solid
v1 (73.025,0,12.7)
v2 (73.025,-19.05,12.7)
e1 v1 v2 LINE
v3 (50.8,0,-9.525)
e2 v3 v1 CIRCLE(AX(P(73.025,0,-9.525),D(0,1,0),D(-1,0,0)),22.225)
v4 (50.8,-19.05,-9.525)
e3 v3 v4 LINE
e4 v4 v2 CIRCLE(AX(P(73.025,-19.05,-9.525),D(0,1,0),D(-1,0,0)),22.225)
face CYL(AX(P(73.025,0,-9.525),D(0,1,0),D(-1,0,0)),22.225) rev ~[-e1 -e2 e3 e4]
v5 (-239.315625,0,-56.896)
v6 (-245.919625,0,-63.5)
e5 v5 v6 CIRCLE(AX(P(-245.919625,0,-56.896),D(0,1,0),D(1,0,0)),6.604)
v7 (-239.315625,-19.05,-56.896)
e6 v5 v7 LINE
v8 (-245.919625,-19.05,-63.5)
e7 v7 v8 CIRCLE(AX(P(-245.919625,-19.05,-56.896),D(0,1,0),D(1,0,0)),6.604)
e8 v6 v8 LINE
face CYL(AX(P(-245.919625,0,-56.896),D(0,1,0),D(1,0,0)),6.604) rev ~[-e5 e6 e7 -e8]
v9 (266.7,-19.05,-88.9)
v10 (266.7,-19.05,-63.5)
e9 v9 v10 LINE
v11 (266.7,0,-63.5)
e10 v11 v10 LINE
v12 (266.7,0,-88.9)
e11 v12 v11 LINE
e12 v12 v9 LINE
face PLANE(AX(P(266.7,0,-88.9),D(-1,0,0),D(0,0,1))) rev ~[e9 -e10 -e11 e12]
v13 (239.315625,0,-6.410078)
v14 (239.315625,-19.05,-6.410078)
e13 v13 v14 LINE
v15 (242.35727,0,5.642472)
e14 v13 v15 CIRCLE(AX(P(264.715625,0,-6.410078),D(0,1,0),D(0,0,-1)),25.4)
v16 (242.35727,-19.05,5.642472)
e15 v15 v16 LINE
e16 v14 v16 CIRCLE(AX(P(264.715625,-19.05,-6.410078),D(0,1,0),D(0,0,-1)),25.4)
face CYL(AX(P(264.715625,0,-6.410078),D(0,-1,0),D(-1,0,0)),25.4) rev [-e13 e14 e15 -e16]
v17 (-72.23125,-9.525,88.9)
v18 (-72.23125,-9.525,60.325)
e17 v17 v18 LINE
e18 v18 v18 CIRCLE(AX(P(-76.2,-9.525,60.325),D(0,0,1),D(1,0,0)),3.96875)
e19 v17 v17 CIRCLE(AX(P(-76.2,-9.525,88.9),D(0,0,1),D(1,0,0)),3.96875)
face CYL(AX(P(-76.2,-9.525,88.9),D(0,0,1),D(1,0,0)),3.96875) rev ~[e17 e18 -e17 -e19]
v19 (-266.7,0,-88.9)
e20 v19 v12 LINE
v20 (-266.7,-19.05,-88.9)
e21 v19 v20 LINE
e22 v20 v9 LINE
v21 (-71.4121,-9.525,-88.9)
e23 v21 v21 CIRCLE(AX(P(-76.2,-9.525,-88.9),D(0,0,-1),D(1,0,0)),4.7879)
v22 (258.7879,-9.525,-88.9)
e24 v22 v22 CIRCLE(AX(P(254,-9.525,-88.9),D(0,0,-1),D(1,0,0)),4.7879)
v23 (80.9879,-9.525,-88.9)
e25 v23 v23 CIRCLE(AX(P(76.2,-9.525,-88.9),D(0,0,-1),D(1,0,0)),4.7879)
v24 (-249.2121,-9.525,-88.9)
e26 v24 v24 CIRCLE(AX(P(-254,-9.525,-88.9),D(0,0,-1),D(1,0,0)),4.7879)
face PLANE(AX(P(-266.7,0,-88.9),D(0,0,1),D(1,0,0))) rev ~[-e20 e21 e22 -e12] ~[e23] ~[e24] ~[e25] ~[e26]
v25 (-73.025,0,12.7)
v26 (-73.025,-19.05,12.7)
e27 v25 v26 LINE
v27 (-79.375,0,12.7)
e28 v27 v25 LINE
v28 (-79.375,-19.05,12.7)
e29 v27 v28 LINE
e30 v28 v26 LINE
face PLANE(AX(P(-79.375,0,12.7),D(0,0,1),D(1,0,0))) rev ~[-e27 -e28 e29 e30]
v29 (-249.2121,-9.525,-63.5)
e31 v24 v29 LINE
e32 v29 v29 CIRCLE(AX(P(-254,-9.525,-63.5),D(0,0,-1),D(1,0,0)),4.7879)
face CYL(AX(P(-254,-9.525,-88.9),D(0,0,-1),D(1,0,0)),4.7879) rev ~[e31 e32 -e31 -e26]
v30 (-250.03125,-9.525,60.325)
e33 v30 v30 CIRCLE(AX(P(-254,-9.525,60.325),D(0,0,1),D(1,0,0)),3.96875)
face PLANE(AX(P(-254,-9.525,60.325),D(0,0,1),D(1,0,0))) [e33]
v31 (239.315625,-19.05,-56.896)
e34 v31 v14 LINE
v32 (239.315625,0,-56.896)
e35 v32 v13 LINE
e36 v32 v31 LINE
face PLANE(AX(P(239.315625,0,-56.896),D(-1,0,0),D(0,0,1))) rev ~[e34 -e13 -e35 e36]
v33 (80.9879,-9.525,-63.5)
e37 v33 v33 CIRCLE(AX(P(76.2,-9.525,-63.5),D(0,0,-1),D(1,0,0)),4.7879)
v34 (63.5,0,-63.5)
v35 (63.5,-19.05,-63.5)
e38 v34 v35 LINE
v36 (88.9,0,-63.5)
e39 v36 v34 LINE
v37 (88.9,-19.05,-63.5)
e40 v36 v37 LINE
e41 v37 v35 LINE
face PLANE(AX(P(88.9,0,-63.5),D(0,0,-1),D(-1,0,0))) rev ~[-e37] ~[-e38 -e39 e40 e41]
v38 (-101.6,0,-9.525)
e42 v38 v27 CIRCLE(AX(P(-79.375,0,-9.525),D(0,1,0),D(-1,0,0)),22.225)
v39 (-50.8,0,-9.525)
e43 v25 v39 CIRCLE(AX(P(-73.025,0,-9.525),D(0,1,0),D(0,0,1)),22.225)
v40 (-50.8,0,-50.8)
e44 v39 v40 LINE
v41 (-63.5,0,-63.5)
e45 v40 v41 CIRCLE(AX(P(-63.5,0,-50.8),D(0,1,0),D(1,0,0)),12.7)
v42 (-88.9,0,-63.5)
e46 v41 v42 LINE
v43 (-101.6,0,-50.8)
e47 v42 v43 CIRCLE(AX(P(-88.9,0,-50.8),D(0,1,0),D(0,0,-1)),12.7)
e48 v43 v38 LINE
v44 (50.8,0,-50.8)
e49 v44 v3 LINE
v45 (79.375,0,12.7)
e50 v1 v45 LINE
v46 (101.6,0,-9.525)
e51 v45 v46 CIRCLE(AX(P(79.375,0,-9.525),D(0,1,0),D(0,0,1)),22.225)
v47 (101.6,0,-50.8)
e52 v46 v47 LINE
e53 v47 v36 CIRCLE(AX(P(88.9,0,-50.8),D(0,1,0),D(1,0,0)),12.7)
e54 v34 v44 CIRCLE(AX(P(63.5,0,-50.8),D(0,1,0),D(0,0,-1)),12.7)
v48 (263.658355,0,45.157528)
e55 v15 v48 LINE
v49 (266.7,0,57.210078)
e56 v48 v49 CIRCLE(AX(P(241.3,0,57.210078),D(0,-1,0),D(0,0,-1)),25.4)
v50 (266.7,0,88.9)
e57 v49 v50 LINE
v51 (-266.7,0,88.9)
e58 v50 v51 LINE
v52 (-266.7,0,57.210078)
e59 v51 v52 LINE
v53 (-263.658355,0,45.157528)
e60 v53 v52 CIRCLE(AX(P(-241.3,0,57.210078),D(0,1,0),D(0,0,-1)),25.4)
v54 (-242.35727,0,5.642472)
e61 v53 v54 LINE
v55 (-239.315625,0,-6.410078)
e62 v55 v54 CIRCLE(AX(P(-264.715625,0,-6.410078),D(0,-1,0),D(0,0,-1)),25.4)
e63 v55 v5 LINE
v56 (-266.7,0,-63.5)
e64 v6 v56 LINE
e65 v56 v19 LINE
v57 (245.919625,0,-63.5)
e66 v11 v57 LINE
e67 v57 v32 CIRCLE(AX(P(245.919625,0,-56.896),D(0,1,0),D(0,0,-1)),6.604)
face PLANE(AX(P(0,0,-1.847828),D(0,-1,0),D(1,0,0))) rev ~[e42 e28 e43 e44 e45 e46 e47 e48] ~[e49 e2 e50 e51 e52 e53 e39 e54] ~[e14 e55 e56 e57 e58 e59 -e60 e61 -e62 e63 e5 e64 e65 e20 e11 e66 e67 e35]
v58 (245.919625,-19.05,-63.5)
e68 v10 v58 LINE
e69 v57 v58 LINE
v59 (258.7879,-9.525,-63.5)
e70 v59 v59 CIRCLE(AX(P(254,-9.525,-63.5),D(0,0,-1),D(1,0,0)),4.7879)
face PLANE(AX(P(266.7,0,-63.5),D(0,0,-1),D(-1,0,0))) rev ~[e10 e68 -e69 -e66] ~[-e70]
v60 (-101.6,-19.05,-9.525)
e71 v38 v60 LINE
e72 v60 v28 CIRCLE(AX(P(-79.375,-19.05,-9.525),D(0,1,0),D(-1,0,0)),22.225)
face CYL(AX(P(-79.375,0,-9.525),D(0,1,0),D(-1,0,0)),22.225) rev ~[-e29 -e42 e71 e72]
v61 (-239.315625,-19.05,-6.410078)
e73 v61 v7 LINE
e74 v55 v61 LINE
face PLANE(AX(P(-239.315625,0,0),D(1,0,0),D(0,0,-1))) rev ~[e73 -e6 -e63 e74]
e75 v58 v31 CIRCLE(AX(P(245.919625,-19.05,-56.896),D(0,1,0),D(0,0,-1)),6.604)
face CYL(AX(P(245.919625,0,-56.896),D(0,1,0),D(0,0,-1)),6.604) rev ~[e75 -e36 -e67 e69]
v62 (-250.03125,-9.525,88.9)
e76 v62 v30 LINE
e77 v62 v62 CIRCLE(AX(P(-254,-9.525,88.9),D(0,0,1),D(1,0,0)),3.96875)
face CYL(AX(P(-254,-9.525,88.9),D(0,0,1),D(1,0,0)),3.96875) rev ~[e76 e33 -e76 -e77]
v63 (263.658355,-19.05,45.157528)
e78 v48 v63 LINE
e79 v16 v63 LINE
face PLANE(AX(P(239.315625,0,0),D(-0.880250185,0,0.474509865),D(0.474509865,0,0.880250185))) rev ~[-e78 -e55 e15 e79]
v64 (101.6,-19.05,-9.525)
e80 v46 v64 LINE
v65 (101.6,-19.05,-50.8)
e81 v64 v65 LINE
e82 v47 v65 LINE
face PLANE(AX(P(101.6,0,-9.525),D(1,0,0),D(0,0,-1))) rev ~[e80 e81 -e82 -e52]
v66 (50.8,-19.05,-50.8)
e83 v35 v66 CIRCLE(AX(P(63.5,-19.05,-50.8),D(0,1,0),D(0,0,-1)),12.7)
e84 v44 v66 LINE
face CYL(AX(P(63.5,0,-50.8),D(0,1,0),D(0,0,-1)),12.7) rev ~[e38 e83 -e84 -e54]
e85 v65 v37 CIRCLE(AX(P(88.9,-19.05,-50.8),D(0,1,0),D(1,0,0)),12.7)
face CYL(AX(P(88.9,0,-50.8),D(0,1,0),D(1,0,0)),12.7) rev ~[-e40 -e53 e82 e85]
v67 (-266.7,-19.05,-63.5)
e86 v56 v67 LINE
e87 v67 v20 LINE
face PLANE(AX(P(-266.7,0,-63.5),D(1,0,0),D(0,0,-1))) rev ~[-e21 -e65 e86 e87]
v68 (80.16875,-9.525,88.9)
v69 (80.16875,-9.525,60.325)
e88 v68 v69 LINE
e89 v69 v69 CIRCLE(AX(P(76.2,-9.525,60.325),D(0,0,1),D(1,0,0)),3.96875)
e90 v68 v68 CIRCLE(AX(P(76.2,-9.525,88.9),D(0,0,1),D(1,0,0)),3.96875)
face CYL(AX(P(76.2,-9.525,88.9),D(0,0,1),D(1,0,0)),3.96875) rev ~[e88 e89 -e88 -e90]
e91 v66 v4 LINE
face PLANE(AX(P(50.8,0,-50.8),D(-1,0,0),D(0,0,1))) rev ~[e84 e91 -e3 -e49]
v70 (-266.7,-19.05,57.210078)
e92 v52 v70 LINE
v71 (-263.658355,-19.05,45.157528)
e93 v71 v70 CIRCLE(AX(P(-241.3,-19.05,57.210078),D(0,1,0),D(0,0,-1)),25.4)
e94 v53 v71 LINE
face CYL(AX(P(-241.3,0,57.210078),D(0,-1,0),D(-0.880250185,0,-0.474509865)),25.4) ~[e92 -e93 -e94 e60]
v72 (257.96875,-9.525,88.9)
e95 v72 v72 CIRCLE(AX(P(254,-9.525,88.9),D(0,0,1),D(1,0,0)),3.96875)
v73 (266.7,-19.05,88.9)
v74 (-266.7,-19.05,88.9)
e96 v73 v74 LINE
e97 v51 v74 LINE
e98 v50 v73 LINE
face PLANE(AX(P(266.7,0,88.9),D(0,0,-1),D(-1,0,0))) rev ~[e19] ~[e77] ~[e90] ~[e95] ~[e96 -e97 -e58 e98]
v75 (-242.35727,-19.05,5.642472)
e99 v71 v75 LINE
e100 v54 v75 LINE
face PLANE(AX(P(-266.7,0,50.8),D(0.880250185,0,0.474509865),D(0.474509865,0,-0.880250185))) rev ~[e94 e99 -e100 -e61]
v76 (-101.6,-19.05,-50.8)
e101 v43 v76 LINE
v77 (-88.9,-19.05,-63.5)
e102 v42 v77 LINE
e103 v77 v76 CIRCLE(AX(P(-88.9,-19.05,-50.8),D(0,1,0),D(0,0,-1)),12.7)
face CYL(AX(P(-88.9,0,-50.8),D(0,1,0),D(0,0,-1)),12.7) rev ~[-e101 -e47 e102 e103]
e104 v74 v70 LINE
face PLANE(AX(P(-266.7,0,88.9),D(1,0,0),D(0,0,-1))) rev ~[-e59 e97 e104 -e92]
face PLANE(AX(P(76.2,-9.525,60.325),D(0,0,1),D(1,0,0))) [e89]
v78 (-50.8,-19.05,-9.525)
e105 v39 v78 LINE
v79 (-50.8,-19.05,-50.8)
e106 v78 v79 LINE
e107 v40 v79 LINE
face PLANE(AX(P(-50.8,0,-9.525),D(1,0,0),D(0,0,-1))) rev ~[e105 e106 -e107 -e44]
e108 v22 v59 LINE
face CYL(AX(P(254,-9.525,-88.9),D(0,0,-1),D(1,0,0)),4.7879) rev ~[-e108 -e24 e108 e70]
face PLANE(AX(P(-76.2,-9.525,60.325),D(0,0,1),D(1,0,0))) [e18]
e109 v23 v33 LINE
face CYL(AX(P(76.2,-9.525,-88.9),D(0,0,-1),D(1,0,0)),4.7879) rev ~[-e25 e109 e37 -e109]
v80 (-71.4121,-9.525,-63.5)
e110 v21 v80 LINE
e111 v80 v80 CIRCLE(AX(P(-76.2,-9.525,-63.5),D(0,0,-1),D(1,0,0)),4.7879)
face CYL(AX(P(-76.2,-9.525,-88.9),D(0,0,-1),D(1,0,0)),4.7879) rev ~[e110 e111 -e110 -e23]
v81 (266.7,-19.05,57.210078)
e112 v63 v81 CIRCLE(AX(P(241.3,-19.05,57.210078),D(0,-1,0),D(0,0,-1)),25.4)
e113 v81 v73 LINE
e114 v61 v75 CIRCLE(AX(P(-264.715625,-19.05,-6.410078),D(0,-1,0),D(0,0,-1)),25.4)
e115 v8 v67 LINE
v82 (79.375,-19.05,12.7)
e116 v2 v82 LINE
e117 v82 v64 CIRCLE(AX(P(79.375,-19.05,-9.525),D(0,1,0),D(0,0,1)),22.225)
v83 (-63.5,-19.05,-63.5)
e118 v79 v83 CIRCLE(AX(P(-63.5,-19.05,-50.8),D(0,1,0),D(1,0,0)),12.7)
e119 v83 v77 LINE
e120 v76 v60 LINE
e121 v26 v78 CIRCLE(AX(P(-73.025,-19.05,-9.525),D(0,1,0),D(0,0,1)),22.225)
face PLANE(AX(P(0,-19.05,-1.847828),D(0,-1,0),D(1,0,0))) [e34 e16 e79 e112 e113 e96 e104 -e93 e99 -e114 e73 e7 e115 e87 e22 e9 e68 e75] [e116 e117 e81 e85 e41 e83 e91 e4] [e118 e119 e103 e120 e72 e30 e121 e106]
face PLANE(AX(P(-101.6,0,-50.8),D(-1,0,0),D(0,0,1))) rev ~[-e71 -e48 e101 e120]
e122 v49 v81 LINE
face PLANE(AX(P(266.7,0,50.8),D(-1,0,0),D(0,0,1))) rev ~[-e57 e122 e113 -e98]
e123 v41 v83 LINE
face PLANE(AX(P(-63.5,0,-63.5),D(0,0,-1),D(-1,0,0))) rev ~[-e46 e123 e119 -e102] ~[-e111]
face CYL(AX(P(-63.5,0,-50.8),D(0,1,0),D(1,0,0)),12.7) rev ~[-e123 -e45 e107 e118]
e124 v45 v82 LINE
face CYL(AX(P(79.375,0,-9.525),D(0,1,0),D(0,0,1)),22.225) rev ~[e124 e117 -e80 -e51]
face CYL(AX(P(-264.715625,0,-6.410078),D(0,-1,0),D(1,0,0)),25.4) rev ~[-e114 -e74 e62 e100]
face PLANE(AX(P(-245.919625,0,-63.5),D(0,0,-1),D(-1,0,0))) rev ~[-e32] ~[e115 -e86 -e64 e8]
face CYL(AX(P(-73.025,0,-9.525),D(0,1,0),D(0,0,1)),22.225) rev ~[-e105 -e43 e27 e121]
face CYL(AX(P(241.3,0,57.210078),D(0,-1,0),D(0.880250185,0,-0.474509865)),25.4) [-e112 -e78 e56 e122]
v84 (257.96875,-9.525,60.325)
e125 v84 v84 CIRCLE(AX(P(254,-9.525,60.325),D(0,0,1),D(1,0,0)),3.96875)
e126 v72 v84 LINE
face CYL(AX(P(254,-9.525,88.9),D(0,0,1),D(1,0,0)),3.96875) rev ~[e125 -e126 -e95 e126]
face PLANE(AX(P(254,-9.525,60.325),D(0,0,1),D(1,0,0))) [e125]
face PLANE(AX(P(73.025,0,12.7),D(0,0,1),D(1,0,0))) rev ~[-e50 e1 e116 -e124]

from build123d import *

# Parameters (mm, degrees)
F1_DEPTH = 19.05
F2_R     = 25.4
F3_R     = 4.7879
F4_DEPTH = 33.02
F5_R     = 3.96875
F6_DEPTH = 28.575


# Not quite as in the source:
# - a feature names something its author has since deleted; it is built from what else it names


with BuildPart() as f1:
    # F0 (on Front) → F1 (new body)
    with BuildSketch(Plane.XZ):
        with BuildLine():
            Line((-266.7, -63.5), (-266.7, -88.9))
            Line((-266.7, -88.9), (266.7, -88.9))
            Line((266.7, -88.9), (266.7, -63.5))
            Line((266.7, -63.5), (245.919625, -63.5))
            ThreePointArc((245.919625, -63.5), (241.249891817, -61.565733183), (239.315625, -56.896))
            Line((239.315625, -56.896), (239.315625, 0))
            Line((239.315625, 0), (266.7, 50.8))
            Line((266.7, 50.8), (266.7, 88.9))
            Line((266.7, 88.9), (-266.7, 88.9))
            Line((-266.7, 88.9), (-266.7, 50.8))
            Line((-266.7, 50.8), (-239.315625, 0))
            Line((-239.315625, 0), (-239.315625, -56.896))
            ThreePointArc((-239.315625, -56.896), (-241.249891817, -61.565733183), (-245.919625, -63.5))
            Line((-245.919625, -63.5), (-266.7, -63.5))
        make_face()
        with BuildLine():
            Line((-63.5, -63.5), (-88.9, -63.5))
            ThreePointArc((-88.9, -63.5), (-97.8802561211, -59.7802561211), (-101.6, -50.8))
            Line((-101.6, -50.8), (-101.6, -9.525))
            ThreePointArc((-101.6, -9.525), (-95.0904482119, 6.1904482119), (-79.375, 12.7))
            Line((-79.375, 12.7), (-73.025, 12.7))
            ThreePointArc((-73.025, 12.7), (-57.3095517881, 6.1904482119), (-50.8, -9.525))
            Line((-50.8, -9.525), (-50.8, -50.8))
            ThreePointArc((-50.8, -50.8), (-54.5197438789, -59.7802561211), (-63.5, -63.5))
        make_face(mode=Mode.SUBTRACT)
        with BuildLine():
            ThreePointArc((63.5, -63.5), (54.5197438789, -59.7802561211), (50.8, -50.8))
            Line((50.8, -50.8), (50.8, -9.525))
            ThreePointArc((50.8, -9.525), (57.3095517881, 6.1904482119), (73.025, 12.7))
            Line((73.025, 12.7), (79.375, 12.7))
            ThreePointArc((79.375, 12.7), (95.0904482119, 6.1904482119), (101.6, -9.525))
            Line((101.6, -9.525), (101.6, -50.8))
            ThreePointArc((101.6, -50.8), (97.8802561211, -59.7802561211), (88.9, -63.5))
            Line((88.9, -63.5), (63.5, -63.5))
        make_face(mode=Mode.SUBTRACT)
    extrude(amount=F1_DEPTH)

    # F2
    f2_edges = [f1.edges().sort_by_distance(p)[0] for p in [
        (-266.7, -9.525, 50.8),
        (-239.315625, -9.525, 0),
        (266.7, -9.525, 50.8),
        (239.315625, -9.525, 0),
    ]]
    fillet(f2_edges, radius=F2_R)

    # F3 (on face) → F4 (cut)
    with BuildSketch(Plane(origin=(0, 0, -88.9), x_dir=(1, 0, 0), z_dir=(0, 0, -1))):
        with Locations((-254, 9.525)):
            Circle(F3_R)
        with Locations((-76.2, 9.525)):
            Circle(F3_R)
        with Locations((254, 9.525)):
            Circle(F3_R)
        with Locations((76.2, 9.525)):
            Circle(F3_R)
    extrude(amount=-F4_DEPTH, mode=Mode.SUBTRACT)

    # F5 (on face) → F6 (cut)
    with BuildSketch(Plane.XY.offset(88.9)):
        with Locations((-254, -9.525)):
            Circle(F5_R)
        with Locations((-76.2, -9.525)):
            Circle(F5_R)
        with Locations((76.2, -9.525)):
            Circle(F5_R)
        with Locations((254, -9.525)):
            Circle(F5_R)
    extrude(amount=-F6_DEPTH, mode=Mode.SUBTRACT)


solid = f1.part
